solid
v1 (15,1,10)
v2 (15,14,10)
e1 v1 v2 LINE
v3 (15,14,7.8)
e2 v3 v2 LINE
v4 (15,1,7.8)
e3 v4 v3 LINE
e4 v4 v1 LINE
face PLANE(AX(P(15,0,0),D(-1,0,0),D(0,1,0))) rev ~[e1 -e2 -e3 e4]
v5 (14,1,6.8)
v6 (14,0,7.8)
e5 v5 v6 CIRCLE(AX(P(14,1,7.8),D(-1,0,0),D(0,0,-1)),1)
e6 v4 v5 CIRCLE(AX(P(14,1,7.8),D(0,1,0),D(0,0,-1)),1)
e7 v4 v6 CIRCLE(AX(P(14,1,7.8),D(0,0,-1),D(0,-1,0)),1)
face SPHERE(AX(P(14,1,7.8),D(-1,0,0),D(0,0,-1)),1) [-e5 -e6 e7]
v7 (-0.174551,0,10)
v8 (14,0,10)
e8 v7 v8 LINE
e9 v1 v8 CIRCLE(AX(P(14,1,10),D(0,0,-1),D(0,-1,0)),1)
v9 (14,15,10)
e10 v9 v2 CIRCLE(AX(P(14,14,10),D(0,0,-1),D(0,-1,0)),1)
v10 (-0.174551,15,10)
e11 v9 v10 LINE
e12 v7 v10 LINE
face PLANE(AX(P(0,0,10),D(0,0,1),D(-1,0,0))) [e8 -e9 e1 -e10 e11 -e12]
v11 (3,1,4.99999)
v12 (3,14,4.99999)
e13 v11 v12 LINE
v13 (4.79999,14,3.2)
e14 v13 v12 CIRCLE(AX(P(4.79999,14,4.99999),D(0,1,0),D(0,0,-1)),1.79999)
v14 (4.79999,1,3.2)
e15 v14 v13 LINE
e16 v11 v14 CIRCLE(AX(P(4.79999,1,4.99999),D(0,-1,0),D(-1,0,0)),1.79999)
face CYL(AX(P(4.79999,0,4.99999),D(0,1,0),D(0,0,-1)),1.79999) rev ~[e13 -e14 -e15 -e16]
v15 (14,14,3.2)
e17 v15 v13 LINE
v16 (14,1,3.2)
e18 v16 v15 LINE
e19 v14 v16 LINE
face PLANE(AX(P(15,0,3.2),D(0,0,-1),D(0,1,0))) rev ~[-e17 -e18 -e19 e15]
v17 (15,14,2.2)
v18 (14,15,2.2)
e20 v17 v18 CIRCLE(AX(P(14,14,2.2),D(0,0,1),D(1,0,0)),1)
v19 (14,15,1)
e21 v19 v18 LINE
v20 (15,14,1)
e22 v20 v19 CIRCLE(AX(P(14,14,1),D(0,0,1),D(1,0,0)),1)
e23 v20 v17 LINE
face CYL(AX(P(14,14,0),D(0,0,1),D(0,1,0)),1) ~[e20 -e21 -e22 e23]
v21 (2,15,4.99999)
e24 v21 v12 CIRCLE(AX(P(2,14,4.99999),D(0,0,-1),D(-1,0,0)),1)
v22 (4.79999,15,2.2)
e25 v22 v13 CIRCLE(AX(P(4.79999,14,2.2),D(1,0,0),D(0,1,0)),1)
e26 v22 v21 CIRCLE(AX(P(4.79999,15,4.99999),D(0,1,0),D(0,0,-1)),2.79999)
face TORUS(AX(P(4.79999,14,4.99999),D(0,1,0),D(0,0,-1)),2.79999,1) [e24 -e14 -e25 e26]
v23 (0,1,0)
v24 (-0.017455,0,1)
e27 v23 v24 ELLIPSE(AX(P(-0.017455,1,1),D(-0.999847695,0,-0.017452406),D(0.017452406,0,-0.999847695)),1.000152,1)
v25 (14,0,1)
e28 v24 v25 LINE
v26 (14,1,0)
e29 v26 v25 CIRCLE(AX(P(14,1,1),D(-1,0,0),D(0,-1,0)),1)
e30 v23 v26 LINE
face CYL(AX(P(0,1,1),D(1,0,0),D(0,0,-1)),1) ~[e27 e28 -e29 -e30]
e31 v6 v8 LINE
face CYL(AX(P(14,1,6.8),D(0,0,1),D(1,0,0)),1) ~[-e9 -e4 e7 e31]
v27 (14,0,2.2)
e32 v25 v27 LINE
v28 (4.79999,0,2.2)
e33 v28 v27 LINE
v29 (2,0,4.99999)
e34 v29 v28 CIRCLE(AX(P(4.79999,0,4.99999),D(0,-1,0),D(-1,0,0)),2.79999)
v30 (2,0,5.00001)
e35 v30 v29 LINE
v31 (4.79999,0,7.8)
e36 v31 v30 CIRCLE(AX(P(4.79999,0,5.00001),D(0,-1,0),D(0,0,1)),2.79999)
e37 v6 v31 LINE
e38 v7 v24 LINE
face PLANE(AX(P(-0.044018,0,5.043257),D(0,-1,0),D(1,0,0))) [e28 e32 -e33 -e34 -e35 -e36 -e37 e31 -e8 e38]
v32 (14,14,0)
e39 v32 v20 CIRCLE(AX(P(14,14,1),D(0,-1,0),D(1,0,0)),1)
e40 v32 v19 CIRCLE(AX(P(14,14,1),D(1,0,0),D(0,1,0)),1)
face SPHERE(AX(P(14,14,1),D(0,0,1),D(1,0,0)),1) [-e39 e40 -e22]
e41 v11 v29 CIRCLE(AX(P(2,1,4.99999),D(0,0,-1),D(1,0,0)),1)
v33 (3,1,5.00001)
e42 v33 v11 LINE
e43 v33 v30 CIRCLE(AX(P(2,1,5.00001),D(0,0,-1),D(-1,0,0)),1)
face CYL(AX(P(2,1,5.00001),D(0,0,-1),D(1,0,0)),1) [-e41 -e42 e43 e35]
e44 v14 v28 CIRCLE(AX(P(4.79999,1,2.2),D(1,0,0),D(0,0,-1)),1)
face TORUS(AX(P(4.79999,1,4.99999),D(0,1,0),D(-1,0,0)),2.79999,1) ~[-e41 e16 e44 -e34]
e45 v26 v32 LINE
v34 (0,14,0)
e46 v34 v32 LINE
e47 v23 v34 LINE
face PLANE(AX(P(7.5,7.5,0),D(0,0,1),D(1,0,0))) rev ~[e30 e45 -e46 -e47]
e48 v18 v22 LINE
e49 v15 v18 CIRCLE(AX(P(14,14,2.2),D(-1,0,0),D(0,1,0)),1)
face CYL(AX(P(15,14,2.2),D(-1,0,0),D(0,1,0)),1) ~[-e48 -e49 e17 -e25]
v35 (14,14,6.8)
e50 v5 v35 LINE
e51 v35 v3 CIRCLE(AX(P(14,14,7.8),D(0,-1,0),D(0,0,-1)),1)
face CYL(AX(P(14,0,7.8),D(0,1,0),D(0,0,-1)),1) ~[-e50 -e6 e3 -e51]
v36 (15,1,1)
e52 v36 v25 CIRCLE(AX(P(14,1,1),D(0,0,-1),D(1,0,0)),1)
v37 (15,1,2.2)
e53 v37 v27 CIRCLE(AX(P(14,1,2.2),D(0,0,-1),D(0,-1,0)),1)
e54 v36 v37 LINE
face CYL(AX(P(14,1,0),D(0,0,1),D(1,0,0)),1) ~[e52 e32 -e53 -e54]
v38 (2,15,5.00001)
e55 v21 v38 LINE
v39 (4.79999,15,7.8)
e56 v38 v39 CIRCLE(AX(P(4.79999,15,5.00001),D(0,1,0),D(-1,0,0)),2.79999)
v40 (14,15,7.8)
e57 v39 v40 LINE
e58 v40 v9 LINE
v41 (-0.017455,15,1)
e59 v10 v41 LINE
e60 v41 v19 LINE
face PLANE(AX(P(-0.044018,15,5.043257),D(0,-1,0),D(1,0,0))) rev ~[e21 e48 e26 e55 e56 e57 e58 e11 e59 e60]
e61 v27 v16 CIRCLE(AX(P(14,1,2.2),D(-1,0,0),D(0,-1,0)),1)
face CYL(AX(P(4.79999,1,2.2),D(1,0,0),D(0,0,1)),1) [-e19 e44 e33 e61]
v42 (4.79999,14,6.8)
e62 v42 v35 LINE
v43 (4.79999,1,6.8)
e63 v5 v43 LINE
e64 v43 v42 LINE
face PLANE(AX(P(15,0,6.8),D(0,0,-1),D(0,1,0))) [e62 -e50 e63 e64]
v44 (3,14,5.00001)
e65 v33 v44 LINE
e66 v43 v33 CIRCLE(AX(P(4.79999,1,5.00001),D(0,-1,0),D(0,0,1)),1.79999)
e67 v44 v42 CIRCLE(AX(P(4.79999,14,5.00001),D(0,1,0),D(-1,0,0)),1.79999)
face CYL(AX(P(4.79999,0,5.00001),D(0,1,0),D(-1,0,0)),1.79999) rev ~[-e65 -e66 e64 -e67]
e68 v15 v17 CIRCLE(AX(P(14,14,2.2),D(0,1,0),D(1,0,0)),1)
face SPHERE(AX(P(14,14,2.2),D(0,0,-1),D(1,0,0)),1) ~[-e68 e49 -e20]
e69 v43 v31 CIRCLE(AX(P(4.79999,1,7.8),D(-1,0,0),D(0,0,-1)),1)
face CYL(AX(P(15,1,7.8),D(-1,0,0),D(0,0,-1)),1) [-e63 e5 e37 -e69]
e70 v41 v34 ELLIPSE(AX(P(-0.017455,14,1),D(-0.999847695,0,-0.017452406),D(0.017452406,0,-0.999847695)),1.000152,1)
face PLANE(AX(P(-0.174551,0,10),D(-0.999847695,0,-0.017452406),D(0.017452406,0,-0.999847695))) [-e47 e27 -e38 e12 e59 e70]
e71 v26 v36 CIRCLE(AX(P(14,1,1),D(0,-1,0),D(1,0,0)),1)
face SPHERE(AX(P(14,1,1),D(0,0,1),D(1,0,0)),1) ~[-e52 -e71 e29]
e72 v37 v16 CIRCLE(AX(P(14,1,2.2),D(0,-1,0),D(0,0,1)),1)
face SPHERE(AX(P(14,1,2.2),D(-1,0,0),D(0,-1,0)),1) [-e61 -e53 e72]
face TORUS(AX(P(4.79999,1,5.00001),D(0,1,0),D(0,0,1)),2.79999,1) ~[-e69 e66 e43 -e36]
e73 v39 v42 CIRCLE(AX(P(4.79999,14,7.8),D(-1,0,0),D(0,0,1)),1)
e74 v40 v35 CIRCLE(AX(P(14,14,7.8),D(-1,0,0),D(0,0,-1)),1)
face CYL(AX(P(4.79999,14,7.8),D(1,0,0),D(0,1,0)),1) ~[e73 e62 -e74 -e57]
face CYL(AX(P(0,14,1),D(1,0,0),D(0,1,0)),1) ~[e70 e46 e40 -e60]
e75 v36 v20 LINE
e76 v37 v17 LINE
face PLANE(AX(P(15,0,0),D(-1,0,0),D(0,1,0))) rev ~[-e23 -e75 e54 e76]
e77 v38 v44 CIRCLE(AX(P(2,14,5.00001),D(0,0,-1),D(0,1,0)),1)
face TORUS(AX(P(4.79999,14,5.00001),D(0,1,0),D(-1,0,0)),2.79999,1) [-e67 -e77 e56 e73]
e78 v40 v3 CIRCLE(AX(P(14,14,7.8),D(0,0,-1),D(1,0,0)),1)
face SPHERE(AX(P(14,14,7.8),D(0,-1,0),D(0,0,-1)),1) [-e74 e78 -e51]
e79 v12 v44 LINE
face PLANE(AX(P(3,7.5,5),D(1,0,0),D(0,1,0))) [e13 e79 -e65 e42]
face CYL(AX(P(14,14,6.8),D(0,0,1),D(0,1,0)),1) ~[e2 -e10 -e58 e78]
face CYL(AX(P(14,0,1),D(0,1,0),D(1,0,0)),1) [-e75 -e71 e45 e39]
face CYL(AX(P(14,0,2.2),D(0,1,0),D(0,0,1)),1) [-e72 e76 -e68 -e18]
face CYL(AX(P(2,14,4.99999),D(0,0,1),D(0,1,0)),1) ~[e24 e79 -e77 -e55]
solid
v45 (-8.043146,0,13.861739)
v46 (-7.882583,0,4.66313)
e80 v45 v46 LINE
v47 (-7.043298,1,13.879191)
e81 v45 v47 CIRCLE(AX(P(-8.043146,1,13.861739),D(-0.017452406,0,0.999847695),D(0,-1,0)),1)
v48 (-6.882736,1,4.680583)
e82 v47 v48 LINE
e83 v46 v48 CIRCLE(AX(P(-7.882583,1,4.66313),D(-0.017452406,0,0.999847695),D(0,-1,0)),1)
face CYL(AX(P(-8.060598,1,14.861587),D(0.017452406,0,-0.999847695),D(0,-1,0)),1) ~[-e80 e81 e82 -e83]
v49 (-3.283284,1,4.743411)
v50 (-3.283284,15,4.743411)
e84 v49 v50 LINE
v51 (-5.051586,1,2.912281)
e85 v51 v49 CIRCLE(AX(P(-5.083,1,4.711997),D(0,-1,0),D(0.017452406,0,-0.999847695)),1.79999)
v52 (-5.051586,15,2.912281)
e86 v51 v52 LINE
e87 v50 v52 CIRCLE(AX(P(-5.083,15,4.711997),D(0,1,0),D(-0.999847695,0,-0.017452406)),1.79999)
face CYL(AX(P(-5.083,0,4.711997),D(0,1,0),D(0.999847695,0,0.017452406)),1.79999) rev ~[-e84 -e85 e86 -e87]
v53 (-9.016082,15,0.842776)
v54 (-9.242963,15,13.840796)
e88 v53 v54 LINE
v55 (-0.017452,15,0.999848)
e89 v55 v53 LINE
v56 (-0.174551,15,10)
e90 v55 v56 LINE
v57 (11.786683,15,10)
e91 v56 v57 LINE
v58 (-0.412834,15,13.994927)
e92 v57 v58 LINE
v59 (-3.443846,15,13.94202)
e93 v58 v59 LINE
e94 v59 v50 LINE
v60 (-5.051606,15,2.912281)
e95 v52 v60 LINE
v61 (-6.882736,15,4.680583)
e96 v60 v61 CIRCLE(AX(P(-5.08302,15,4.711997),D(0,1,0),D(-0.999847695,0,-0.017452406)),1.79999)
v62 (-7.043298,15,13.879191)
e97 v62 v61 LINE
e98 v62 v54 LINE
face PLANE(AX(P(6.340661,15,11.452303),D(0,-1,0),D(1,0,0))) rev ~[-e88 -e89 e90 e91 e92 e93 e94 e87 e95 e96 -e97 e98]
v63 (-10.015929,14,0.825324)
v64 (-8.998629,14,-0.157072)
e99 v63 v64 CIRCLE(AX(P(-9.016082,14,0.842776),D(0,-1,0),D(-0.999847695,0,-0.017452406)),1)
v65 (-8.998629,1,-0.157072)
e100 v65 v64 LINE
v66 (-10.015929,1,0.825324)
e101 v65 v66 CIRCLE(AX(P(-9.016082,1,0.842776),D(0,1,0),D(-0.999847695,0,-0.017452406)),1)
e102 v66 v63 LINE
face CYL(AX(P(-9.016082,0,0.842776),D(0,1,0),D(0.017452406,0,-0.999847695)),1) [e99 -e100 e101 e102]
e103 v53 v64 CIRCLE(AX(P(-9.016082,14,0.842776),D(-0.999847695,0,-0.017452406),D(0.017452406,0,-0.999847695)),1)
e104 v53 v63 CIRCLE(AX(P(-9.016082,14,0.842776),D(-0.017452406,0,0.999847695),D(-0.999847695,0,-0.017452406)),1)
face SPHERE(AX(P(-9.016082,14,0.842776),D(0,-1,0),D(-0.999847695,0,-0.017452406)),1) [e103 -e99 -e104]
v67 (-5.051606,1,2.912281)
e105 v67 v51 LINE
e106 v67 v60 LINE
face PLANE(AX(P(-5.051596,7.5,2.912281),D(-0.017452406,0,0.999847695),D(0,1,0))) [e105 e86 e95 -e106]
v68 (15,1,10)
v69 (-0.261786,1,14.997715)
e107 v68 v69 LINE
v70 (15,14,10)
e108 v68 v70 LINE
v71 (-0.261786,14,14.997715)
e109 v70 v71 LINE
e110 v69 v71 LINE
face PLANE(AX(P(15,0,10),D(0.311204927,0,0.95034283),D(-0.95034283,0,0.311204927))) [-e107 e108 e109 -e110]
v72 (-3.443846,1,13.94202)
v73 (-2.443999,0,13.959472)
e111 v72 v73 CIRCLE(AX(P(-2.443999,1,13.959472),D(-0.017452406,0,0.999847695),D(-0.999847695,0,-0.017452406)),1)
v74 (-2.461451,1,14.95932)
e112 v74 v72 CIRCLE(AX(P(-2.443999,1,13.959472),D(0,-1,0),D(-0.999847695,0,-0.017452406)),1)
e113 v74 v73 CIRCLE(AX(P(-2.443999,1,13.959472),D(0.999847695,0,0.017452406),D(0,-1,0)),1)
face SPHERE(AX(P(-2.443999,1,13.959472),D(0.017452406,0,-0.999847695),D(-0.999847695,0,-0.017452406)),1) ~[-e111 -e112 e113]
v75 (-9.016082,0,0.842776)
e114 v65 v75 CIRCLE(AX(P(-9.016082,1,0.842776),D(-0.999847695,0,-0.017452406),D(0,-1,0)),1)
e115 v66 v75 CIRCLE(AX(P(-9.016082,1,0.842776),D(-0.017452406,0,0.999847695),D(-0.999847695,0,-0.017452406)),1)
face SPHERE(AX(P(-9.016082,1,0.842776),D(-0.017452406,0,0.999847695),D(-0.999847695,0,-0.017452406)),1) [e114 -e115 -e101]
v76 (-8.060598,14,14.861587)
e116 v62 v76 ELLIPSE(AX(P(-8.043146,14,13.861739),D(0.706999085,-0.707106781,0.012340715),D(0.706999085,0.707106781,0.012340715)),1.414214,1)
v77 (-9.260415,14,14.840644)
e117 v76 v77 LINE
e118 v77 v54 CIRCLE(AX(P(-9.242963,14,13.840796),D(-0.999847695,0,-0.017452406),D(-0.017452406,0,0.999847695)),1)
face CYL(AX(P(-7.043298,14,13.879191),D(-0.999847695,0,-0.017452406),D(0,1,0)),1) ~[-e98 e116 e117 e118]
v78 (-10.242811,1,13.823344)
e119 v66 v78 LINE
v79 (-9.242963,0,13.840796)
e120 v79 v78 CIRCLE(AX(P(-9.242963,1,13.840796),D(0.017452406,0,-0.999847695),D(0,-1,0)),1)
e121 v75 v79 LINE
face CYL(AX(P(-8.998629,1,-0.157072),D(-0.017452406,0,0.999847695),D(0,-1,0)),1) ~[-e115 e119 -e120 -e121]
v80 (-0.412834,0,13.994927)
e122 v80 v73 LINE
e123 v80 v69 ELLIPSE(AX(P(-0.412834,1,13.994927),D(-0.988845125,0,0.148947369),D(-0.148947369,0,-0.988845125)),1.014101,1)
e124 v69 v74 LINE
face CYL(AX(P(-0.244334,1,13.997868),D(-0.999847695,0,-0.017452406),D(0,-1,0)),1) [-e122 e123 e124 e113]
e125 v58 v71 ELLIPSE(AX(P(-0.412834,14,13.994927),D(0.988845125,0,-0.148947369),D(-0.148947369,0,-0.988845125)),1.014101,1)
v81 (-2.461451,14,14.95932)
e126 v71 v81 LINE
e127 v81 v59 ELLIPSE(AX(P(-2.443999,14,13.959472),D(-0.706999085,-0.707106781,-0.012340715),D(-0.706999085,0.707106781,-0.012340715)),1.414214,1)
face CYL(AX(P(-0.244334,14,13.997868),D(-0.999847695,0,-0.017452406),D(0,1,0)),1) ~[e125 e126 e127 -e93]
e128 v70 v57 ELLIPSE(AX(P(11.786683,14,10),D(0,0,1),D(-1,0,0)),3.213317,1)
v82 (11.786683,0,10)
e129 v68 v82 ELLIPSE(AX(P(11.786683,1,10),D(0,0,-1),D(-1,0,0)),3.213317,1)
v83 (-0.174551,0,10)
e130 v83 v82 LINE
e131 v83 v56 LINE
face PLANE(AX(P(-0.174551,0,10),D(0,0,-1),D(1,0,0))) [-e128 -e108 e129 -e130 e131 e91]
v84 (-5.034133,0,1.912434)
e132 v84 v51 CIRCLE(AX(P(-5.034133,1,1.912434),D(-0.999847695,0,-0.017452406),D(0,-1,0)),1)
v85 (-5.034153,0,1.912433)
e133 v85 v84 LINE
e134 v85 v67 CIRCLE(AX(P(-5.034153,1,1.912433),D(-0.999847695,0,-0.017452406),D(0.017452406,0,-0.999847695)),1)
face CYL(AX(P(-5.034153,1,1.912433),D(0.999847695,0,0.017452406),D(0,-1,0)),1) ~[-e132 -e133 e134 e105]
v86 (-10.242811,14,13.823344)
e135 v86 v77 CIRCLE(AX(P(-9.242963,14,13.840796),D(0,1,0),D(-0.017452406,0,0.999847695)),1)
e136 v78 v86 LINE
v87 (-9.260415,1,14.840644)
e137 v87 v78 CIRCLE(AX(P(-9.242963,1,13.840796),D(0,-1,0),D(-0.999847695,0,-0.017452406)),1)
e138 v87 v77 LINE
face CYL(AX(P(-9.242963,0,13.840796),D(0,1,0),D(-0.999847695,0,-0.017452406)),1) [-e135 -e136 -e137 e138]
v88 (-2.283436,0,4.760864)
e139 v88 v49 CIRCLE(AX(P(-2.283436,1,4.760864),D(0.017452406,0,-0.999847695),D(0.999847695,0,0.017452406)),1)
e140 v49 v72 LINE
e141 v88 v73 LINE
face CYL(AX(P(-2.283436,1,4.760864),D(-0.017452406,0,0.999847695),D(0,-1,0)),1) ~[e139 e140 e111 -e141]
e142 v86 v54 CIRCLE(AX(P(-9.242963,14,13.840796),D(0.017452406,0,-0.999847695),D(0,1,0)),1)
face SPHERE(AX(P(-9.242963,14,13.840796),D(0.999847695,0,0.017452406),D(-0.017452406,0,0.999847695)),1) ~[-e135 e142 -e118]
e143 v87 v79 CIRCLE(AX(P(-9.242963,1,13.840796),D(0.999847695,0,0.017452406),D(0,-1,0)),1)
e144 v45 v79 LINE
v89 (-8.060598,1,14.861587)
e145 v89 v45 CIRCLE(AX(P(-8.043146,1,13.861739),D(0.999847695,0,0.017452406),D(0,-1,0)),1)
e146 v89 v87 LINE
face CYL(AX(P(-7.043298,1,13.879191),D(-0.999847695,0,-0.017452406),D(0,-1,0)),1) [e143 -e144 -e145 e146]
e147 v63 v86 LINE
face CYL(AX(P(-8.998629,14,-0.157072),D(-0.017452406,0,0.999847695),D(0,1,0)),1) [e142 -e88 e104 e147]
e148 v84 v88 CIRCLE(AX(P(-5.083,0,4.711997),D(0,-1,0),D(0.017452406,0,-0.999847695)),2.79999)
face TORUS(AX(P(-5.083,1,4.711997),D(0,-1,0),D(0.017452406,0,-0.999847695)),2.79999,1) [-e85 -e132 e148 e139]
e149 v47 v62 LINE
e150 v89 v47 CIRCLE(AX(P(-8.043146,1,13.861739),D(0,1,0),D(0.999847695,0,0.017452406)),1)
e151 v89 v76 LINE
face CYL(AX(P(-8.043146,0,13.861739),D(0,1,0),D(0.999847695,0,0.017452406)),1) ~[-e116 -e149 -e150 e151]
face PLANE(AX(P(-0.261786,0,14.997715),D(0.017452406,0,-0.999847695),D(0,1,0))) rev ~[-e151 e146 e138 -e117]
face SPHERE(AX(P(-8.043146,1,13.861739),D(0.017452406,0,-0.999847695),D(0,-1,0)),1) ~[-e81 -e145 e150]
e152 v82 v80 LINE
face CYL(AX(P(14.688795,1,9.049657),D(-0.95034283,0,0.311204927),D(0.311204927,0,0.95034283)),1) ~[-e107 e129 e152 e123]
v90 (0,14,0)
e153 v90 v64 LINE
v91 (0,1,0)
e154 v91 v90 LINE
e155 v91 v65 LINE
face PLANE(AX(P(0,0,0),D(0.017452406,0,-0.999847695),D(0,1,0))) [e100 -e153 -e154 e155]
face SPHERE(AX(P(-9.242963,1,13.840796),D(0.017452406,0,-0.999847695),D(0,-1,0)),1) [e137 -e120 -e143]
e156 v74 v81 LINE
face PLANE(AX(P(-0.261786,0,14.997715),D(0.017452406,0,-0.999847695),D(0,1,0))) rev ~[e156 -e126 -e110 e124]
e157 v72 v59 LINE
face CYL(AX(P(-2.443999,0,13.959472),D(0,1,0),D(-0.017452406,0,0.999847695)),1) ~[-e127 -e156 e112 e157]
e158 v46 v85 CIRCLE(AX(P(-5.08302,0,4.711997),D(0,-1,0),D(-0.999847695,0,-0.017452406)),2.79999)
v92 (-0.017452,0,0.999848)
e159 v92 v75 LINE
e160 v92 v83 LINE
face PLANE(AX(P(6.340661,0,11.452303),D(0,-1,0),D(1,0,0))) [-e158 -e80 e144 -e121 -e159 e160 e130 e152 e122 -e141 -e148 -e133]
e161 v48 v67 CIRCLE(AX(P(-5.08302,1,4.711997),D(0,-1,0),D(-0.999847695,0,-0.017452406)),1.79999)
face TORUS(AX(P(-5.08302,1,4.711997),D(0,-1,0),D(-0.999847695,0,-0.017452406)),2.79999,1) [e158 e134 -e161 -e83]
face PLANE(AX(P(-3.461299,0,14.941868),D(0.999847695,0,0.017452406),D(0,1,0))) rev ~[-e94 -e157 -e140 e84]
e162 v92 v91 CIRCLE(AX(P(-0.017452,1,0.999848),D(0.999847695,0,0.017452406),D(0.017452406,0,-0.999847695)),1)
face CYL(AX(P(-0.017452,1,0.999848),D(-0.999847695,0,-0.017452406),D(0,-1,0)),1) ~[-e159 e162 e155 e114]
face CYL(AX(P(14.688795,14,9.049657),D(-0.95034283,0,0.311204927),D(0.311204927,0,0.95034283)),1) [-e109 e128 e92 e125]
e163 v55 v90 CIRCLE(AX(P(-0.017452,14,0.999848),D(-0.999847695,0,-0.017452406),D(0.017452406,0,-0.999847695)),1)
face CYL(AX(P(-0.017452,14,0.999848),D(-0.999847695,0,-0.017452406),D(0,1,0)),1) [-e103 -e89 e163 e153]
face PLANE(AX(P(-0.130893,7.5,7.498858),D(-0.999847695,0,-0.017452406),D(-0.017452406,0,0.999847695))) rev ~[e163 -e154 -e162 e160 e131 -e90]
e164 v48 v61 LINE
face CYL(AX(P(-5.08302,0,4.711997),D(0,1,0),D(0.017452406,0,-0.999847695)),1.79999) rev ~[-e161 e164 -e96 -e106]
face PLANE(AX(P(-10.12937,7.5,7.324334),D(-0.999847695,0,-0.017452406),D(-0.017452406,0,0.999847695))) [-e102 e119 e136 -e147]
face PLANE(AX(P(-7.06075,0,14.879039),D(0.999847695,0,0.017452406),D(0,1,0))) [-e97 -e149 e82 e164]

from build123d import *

# Parameters (mm, degrees)
F0_W     = 15
F0_H     = 15
F1_DEPTH = 10
F2_W     = 15
F2_H     = 3.6
F3_DEPTH = 12
F4_R     = 1.79999
F5_COUNT = 2
F5_ANGLE = 91
F7_DEPTH = 15
F9_DEPTH = 15
F10_R    = 1
F10_2_R  = 1


# Not quite as in the source:
# - a fillet or chamfer is up to 0.001 mm smaller than in the source, because OpenCascade refuses the exact size


with BuildPart() as f1:
    # F0 (on Top) → F1 (new body)
    with BuildSketch(Plane.XY):
        with Locations((7.5, 7.5)):
            Rectangle(F0_W, F0_H)
    extrude(amount=F1_DEPTH)

    # F2 (on face) → F3 (cut)
    with BuildSketch(Plane.YZ.offset(15)):
        with Locations((7.5, 5)):
            Rectangle(F2_W, F2_H)
    extrude(amount=-F3_DEPTH, mode=Mode.SUBTRACT)

    # F4 (radius 1.8 in the source; OpenCascade refuses exactly that, so slightly less here)
    f4_edges = [f1.edges().sort_by_distance(p)[0] for p in [
        (3, 7.5, 3.2),
        (3, 7.5, 6.8),
    ]]
    fillet(f4_edges, radius=F4_R)


with BuildPart() as f5_1:
    # F5: instance of F1
    add(f1.part.rotate(Axis((0, 7.5, 0), (0, -1, 0)), 1 * F5_ANGLE / (F5_COUNT - 1)))

    # F8 (on Front) → F9 (join, through all)
    with BuildSketch(Plane.XZ):
        Polygon((-0.2617860966, 14.9977154273), (-0.1745506493, 10), (15, 10), align=None)
    extrude(amount=-F9_DEPTH)

    # F10#2
    f10_2_edges = [f5_1.edges().sort_by_distance(p)[0] for p in [
        (-10.12937, 0, 7.324334),
        (-6.971743, 0, 9.779811),
        (-8.660507, 0, 14.851115),
        (-7.06075, 7.5, 14.879039),
        (-8.660507, 15, 14.851115),
        (-10.260263, 7.5, 14.823191),
        (-9.998477, 7.5, -0.174524),
        (-10.12937, 15, 7.324334),
        (-3.461299, 7.5, 14.941868),
        (-4.999238, 0, -0.087262),
        (-4.999238, 15, -0.087262),
        (-1.861542, 0, 14.969792),
        (7.369107, 0, 12.498858),
        (-1.861542, 15, 14.969792),
        (7.369107, 15, 12.498858),
        (-6.333398, 0, 3.417192),
        (-5.051596, 0, 2.912281),
        (-3.788195, 0, 3.461619),
        (-3.372291, 0, 9.842639),
    ]]
    fillet(f10_2_edges, radius=F10_2_R)


with BuildPart() as f1_1:
    add(f1.part)

    # F6 (on face) → F7 (join, through all)
    with BuildSketch(Plane.XZ):
        Polygon((0, 0), (0, 10), (-0.1745506493, 10), align=None)
    extrude(amount=-F7_DEPTH)

    # F10
    f10_edges = [f1_1.edges().sort_by_distance(p)[0] for p in [
        (9.899995, 0, 6.8),
        (15, 7.5, 6.8),
        (15, 15, 1.6),
        (15, 0, 1.6),
        (15, 7.5, 3.2),
        (9.899995, 15, 3.2),
        (15, 7.5, 0),
        (7.5, 0, 0),
        (7.5, 15, 0),
        (15, 0, 8.4),
        (15, 15, 8.4),
        (9.899995, 15, 6.8),
        (3.527205, 15, 3.727205),
        (3, 15, 5),
        (3.527205, 15, 6.272795),
        (3.527205, 0, 6.272795),
        (9.899995, 0, 3.2),
        (3, 0, 5),
        (3.527205, 0, 3.727205),
    ]]
    fillet(f10_edges, radius=F10_R)


solid = Compound([f5_1.part, f1_1.part])
